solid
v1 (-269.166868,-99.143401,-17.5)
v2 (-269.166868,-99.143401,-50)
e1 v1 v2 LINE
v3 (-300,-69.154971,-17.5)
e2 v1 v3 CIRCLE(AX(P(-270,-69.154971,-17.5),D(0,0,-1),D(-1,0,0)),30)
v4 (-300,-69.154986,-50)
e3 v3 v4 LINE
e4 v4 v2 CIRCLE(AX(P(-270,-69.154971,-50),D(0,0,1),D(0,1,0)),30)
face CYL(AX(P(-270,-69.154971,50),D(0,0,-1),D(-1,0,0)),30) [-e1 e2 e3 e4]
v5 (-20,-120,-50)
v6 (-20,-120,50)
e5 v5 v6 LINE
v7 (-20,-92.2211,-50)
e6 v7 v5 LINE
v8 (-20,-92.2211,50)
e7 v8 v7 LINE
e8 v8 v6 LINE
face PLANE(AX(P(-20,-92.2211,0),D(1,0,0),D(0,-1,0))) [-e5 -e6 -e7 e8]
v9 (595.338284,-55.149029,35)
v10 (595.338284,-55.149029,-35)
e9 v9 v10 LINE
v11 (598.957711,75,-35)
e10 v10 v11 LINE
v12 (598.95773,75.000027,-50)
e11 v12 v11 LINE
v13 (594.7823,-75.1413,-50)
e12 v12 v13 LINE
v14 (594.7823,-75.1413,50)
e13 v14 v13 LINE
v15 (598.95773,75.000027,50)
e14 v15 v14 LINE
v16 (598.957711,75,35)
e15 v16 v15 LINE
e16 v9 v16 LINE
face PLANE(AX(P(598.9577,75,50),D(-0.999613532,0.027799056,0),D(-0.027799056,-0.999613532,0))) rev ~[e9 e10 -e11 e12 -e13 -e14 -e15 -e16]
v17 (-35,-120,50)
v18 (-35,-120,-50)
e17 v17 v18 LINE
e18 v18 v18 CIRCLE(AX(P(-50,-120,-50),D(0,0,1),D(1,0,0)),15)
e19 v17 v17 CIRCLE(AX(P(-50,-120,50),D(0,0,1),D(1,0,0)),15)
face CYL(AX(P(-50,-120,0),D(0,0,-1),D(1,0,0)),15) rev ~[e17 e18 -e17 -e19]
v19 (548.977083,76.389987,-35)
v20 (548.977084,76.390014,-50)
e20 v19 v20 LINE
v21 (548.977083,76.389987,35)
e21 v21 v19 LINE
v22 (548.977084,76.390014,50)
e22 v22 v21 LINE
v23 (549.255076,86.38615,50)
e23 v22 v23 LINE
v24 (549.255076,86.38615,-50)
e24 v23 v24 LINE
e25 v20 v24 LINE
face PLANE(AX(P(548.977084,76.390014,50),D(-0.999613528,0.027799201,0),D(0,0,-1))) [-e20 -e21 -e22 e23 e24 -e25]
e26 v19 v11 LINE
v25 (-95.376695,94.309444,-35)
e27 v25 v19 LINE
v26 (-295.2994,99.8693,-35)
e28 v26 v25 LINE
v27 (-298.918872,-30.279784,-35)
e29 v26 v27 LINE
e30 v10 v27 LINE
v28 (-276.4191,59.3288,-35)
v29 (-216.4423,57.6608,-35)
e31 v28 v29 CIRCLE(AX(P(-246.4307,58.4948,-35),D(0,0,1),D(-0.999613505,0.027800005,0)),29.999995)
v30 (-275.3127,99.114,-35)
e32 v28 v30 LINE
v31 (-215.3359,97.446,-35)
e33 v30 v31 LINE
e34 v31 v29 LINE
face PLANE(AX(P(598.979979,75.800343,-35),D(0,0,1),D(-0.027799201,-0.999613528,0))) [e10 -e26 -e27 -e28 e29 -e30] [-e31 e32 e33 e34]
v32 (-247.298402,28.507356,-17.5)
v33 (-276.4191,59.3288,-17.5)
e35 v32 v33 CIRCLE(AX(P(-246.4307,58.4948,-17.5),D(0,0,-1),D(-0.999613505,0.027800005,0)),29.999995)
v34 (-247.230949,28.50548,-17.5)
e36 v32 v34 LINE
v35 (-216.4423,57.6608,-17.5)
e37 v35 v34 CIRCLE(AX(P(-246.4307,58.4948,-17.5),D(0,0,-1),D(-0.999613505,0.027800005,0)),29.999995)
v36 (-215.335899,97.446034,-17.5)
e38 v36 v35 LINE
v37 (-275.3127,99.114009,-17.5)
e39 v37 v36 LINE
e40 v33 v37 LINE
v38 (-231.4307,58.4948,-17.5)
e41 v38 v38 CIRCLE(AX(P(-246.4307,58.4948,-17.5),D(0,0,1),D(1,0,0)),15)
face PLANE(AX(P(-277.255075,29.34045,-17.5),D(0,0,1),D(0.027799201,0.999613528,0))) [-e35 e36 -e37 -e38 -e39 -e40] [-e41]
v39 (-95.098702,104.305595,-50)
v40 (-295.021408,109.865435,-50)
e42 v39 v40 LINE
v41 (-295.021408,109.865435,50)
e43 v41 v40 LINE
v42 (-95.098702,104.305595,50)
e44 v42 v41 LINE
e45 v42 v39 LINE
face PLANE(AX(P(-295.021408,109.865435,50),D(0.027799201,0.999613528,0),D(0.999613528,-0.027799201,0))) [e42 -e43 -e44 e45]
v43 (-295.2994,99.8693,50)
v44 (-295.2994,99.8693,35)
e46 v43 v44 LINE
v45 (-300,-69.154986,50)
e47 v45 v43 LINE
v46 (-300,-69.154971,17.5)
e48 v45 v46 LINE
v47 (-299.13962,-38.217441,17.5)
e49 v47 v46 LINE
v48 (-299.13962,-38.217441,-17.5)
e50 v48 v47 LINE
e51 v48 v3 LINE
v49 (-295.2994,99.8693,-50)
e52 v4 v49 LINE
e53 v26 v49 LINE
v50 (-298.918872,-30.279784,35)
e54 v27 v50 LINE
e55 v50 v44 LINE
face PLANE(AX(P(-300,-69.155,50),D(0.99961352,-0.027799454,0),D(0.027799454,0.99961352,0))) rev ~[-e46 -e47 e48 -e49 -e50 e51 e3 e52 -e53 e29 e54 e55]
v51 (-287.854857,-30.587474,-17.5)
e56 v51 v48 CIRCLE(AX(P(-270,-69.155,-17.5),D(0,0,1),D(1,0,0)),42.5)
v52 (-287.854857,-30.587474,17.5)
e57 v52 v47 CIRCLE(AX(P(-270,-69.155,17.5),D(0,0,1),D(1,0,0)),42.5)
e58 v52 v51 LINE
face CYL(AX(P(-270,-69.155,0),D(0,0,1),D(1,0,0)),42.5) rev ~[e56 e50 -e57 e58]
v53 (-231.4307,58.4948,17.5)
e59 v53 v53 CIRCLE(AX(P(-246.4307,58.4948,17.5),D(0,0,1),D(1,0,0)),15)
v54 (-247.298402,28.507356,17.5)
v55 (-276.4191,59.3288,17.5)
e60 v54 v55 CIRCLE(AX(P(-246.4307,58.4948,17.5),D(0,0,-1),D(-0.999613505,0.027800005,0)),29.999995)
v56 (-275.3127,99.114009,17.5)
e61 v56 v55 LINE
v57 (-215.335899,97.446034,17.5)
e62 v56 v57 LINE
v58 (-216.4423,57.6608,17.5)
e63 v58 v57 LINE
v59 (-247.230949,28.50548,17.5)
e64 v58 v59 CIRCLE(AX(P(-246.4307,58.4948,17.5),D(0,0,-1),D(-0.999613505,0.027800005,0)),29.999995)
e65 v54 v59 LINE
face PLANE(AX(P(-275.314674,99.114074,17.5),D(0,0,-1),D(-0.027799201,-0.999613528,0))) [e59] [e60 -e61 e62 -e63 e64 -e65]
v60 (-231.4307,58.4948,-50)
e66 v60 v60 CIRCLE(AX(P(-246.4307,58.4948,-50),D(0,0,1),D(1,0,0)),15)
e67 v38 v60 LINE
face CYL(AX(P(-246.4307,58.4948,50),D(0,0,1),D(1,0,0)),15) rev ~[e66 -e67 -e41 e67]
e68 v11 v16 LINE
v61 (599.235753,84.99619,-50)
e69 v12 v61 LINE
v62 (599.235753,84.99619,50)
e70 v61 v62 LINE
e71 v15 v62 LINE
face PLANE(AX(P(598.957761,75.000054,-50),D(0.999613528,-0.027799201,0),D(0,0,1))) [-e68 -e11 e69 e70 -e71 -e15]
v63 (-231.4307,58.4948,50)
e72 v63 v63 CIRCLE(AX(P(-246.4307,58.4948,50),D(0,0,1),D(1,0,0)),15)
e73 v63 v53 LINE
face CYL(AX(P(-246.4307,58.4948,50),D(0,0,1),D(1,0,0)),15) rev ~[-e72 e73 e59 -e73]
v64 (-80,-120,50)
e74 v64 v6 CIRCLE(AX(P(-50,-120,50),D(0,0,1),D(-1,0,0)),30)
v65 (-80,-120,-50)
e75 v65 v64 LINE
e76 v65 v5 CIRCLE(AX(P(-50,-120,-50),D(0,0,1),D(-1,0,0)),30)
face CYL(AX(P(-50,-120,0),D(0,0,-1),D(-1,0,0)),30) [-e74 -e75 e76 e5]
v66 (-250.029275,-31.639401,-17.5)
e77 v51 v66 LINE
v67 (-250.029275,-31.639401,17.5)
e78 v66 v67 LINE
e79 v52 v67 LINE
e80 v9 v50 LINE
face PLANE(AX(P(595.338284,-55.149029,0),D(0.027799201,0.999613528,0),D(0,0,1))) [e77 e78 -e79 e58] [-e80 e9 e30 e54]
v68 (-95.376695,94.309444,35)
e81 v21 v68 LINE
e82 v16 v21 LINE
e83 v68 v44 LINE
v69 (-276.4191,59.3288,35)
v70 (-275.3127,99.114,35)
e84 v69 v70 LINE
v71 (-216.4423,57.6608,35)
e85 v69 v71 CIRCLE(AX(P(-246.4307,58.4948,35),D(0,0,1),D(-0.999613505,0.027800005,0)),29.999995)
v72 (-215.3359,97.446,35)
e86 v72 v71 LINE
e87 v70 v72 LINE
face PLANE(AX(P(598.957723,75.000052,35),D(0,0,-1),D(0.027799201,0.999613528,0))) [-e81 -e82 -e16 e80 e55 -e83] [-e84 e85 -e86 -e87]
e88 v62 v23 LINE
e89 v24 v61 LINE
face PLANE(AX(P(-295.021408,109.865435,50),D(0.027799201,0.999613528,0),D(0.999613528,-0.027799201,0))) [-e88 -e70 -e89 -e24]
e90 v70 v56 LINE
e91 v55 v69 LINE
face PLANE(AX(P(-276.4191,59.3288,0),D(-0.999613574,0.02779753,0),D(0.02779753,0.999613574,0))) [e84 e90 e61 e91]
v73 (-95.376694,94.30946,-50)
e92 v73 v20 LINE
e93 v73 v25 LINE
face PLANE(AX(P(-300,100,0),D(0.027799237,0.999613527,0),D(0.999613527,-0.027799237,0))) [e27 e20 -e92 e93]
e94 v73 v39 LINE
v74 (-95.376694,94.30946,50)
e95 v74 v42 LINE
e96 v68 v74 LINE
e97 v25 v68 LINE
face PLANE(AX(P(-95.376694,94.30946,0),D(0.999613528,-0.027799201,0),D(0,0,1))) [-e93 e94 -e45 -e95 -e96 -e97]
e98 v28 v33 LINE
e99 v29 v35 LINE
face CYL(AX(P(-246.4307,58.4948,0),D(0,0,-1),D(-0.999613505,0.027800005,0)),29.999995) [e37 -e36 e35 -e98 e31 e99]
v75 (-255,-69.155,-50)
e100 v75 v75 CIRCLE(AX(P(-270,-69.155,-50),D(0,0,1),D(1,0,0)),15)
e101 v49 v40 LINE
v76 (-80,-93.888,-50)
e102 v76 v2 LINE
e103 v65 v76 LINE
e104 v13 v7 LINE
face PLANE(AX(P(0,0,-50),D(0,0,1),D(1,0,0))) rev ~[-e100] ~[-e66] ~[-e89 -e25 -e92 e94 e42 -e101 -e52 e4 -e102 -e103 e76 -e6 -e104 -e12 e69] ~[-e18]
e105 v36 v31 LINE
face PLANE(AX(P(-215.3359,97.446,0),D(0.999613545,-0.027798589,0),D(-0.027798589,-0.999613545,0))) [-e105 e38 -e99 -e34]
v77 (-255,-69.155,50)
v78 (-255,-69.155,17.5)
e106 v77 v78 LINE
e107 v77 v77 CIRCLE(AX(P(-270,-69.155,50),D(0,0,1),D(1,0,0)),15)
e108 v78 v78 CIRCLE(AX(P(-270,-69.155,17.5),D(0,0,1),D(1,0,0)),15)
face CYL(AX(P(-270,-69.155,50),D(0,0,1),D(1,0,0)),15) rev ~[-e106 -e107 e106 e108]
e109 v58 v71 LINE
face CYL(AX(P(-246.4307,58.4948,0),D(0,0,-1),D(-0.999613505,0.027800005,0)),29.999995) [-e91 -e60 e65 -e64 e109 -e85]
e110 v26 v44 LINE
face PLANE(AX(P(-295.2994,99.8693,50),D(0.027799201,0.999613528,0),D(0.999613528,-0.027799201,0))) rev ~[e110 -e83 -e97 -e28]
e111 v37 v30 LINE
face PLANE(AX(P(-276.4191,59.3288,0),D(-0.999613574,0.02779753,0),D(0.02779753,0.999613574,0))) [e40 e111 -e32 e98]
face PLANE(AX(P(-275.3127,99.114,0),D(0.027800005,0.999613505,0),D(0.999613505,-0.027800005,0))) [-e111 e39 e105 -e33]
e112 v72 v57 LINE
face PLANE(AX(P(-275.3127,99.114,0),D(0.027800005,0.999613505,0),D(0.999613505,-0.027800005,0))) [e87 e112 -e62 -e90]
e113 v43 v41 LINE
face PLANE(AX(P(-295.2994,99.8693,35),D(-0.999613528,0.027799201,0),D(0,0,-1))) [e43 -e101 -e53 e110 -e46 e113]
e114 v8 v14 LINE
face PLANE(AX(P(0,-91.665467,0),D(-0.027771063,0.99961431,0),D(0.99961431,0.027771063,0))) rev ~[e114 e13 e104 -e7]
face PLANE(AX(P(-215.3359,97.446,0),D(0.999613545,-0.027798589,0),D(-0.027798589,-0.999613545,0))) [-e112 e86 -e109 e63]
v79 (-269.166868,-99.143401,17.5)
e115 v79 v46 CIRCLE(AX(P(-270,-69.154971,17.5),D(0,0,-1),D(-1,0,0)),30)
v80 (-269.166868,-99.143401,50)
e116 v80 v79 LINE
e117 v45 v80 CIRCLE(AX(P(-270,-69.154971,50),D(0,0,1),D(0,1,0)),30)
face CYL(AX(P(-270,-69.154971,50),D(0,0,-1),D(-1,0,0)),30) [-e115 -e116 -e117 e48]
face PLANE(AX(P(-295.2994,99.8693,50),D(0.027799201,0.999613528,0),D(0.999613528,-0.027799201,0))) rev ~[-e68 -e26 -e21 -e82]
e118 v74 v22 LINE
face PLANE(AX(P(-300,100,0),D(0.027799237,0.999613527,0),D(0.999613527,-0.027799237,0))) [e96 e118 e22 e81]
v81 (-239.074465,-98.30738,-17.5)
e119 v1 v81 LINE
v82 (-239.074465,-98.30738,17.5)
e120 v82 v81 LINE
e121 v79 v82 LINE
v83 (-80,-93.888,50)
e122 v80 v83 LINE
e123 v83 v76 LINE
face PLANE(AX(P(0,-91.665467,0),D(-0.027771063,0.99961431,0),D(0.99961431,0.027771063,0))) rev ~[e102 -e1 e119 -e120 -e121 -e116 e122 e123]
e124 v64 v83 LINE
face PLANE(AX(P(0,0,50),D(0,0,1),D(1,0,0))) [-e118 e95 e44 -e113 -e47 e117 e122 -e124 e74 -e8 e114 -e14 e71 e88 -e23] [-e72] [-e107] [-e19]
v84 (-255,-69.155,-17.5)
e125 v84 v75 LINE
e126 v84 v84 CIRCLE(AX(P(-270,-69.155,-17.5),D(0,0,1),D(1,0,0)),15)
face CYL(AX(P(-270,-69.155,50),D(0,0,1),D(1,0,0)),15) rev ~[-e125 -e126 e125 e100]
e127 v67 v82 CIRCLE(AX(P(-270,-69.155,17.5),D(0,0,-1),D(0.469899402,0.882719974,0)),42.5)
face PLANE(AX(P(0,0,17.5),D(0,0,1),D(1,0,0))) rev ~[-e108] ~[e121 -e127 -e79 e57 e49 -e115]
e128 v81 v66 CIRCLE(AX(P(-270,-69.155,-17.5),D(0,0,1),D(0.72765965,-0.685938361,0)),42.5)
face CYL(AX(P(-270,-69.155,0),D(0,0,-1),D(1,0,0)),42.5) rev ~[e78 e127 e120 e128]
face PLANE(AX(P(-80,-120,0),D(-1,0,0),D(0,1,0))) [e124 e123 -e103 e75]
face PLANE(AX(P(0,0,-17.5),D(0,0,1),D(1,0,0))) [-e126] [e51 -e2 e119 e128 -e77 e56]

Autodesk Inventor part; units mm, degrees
ref_plane "YZ Plane" through (0, 0, 0) normal (1, 0, 0) x (0, 1, 0)
ref_plane "XZ Plane" through (0, 0, 0) normal (0, 1, 0) x (-1, 0, 0)
ref_plane "XY Plane" through (0, 0, 0) normal (0, 0, 1) x (1, 0, 0)
sketch "草图1" plane through (0, 0, 0) normal (0, 0, 1) x (1, 0, 0)
  line L0 (598.9577, 75) -> (600, -74.9964)
  line L1 (-601.0423, 75.1267) -> (600, -74.9964) construction
  line L2 (598.9577, 75) -> (-593.8092, -74.3553) construction
  line L3 (-300, 0) -> (-300, 100)
  line L4 (-300, -100) -> (600, -74.9964)
  line L5 (-300, 100) -> (598.9577, 75)
  line L6 (-300, 0) -> (-300, -100)
  line L7 (599.4789, 0) -> (-300, 0)
  line L8 (0, 0) -> (0, -189.9048)
  dimension "d0" = 150
  dimension "d31" = 75
  dimension "d32" = 0
  dimension "d33" = 100
  dimension "d34" = 100
  dimension "d35" = 100
  dimension "d51" = 300
extrude "拉伸1" add sketch "草图1" along normal mid plane 100
sketch "草图2" plane through (0, 0, 0) normal (0, 0, 1) x (1, 0, 0)
  circle A0 centre (-50, -120) radius 15
  line L0 (0, 0) -> (0, -405.8359)
  line L1 (0, 0) -> (-641.787, 0)
  line L2 (-80, -120) -> (-80, -93.888)
  line L3 (-300, -100) -> (600, -74.9964) projected
  line L4 (-20, -92.2211) -> (-20, -120)
  arc A1 (-80, -120) -> (-20, -120) centre (-50, -120) ccw
  dimension "d8" = 30
  dimension "d9" = 120
  dimension "d10" = 50
  dimension "d28" = 30
extrude "拉伸2" add sketch "草图2" along normal mid plane 100
fillet "圆角1" radius 30 1 edges at (-300, -100, 0)
sketch "草图4" plane through (0, 0, 50) normal (0, 0, 1) x (1, 0, 0)
  arc A0 (-300, -69.155) -> (-269.1669, -99.1434) centre (-270, -69.155) ccw projected
  circle A1 centre (-270, -69.155) radius 15
  point P0 (0, 0)
  dimension "d15" = 30
extrude "拉伸3" cut sketch "草图4" against normal blind 100
sketch "草图5" plane through (0, 0, 50) normal (0, 0, 1) x (1, 0, 0)
  arc A0 (-300, -69.155) -> (-269.1669, -99.1434) centre (-270, -69.155) ccw projected
  line L0 (-300, -69.155) -> (-300, 100)
  line L1 (598.9577, 75) -> (-300, 100) projected
  line L2 (-300, 100) -> (-300, -69.155) projected
  line L3 (-300, 100) -> (-300, 100)
  line L4 (-300, -69.155) -> (-295.2994, 99.8693)
  line L5 (-295.2994, 99.8693) -> (-300, 100)
  line L6 (598.9577, 75) -> (594.7823, -75.1413)
  line L7 (600, -74.9964) -> (-269.1669, -99.1434) projected
  line L8 (598.9577, 75) -> (600, -74.9964) projected
  line L9 (600, -74.9964) -> (598.9577, 75)
  point P0 (0, 0)
  point P1 (-603.2218, 0)
  point P2 (599.4789, 0)
  dimension "d20" = 90
extrude "拉伸4" cut sketch "草图5" against normal blind 100 contours L0 L1 L4 | L6 L8 L7
sketch "草图6" plane through (594.7823, -75.1413, 50) normal (0.9996135, -0.0277992, 0) x (0, 0, -1)
  line L0 (0, 0) -> (0, 150.1994) projected
  line L1 (0, 150.1994) -> (100, 150.1994) projected
  line L2 (50, 150.1994) -> (50, 0)
  line L3 (100, 0) -> (0, 0) projected
  line L4 (100, 150.1994) -> (100, 0) projected
  line L5 (15, 151) -> (85, 151)
  line L6 (85, 151) -> (85, 20)
  line L7 (85, 20) -> (15, 20)
  line L8 (15, 20) -> (15, 151)
  line L9 (15, 151) -> (85, 20) construction
  line L10 (85, 151) -> (15, 20) construction
  point P0 (50, 58.5778)
  point P1 (50, 85.5)
  point P2 (0, 100.4456)
  point P3 (0, 175.4618)
  point P4 (100, 175.4618)
  point P5 (100, 100.4456)
  dimension "d21" = 70
  dimension "d22" = 131
  dimension "d63" = 20
extrude "拉伸5" cut sketch "草图6" against normal through all contours L8 L5 L6 L1 | L1 L2 L7 L8 | L2 L1 L6 L7
sketch "草图7" plane through (0, 0, 0) normal (0, 0, 1) x (1, 0, 0)
  arc A0 (-300, -69.155) -> (-269.1669, -99.1434) centre (-270, -69.155) ccw projected
  circle A1 centre (-270, -69.155) radius 42.5
  point P0 (0, 0)
  dimension "d25" = 85
extrude "拉伸6" cut sketch "草图7" along normal mid plane 35
sketch "草图8" plane through (0, 0, 0) normal (0, 0, 1) x (1, 0, 0)
  line L0 (-632.149, 69.2216) -> (221.7891, 45.4736)
  line L1 (-295.2994, 99.8693) -> (-298.9189, -30.2798) projected
  line L2 (598.9577, 75) -> (-295.2994, 99.8693) projected
  circle A0 centre (-246.4307, 58.4948) radius 15
  arc A1 (-276.4191, 59.3288) -> (-216.4423, 57.6608) centre (-246.4307, 58.4948) ccw
  line L3 (-276.4191, 59.3288) -> (-275.3072, 99.3133)
  line L4 (-275.3072, 99.3133) -> (-520.3529, 106.128)
  line L5 (-275.3127, 99.114) -> (-215.3359, 97.446)
  line L6 (598.9522, 74.8007) -> (-295.305, 99.67) projected
  line L7 (-215.3359, 97.446) -> (-216.4423, 57.6608)
  point P0 (0, 0)
  dimension "d36" = 40
  dimension "d37" = 30
  dimension "d38" = 60
  dimension "d39" = 50
  dimension "d40" = 90
  dimension "d41" = 60
extrude "拉伸7" add sketch "草图8" along normal mid plane 70 contours L3 L5 L7 L0 A0 | L0 A0 A1 | A0 L0 | L0 A0
sketch "草图9" plane through (0, 0, 50) normal (0, 0, 1) x (1, 0, 0)
  arc A0 (-276.4191, 59.3288) -> (-216.4423, 57.6608) centre (-246.4307, 58.4948) ccw projected
  circle A1 centre (-246.4307, 58.4948) radius 15
  point P0 (0, 0)
  dimension "d44" = 30
extrude "拉伸8" cut sketch "草图9" against normal through all
sketch "草图10" plane through (-276.4191, 59.3288, -35) normal (-0.9996135, 0.0277992, 0) x (0, 0, 1)
  line L0 (0, 39.8006) -> (70, 39.8006) projected
  line L1 (35, 39.8006) -> (35, -30)
  line L2 (0, -30) -> (70, -30) projected
  line L3 (17.5, 39.8006) -> (52.5, 39.8006)
  line L4 (52.5, 39.8006) -> (52.5, -30)
  line L5 (52.5, -30) -> (17.5, -30)
  line L6 (17.5, -30) -> (17.5, 39.8006)
  line L7 (17.5, 39.8006) -> (52.5, -30) construction
  line L8 (52.5, 39.8006) -> (17.5, -30) construction
  point P0 (35, -51.6216)
  point P1 (35, 4.9003)
  dimension "d47" = 35
extrude "拉伸9" cut sketch "草图10" against normal blind 60
sketch "草图13" plane through (-295.2994, 99.8693, 50) normal (0.0277992, 0.9996135, 0) x (0.9996135, -0.0277992, 0)
  line L0 (0, 15) -> (0, 85) projected
  line L1 (0, 50) -> (323.6348, 50)
  line L2 (0, 100) -> (31.6549, 100) projected
  line L3 (200, 0) -> (0, 0)
  line L4 (0, 0) -> (0, 100)
  line L5 (0, 100) -> (200, 100)
  line L6 (200, 100) -> (200, 0)
  line L7 (200, 0) -> (0, 100) construction
  line L8 (0, 0) -> (200, 100) construction
  line L9 (894.6029, 100) -> (894.6029, 0) projected
  line L10 (844.6029, 100) -> (894.6029, 100)
  line L11 (894.6029, 100) -> (894.6029, 0)
  line L12 (894.6029, 0) -> (844.6029, 0)
  line L13 (844.6029, 0) -> (844.6029, 100)
  line L14 (844.6029, 100) -> (894.6029, 0) construction
  line L15 (894.6029, 100) -> (844.6029, 0) construction
  point P0 (297.9616, 50)
  point P1 (100, 50)
  point P2 (869.6029, 50)
  dimension "d64" = 200
  dimension "d65" = 50
extrude "拉伸12" add sketch "草图13" along normal blind 10
properties part number "DipperParent" material "钢，高强度，低合金"
